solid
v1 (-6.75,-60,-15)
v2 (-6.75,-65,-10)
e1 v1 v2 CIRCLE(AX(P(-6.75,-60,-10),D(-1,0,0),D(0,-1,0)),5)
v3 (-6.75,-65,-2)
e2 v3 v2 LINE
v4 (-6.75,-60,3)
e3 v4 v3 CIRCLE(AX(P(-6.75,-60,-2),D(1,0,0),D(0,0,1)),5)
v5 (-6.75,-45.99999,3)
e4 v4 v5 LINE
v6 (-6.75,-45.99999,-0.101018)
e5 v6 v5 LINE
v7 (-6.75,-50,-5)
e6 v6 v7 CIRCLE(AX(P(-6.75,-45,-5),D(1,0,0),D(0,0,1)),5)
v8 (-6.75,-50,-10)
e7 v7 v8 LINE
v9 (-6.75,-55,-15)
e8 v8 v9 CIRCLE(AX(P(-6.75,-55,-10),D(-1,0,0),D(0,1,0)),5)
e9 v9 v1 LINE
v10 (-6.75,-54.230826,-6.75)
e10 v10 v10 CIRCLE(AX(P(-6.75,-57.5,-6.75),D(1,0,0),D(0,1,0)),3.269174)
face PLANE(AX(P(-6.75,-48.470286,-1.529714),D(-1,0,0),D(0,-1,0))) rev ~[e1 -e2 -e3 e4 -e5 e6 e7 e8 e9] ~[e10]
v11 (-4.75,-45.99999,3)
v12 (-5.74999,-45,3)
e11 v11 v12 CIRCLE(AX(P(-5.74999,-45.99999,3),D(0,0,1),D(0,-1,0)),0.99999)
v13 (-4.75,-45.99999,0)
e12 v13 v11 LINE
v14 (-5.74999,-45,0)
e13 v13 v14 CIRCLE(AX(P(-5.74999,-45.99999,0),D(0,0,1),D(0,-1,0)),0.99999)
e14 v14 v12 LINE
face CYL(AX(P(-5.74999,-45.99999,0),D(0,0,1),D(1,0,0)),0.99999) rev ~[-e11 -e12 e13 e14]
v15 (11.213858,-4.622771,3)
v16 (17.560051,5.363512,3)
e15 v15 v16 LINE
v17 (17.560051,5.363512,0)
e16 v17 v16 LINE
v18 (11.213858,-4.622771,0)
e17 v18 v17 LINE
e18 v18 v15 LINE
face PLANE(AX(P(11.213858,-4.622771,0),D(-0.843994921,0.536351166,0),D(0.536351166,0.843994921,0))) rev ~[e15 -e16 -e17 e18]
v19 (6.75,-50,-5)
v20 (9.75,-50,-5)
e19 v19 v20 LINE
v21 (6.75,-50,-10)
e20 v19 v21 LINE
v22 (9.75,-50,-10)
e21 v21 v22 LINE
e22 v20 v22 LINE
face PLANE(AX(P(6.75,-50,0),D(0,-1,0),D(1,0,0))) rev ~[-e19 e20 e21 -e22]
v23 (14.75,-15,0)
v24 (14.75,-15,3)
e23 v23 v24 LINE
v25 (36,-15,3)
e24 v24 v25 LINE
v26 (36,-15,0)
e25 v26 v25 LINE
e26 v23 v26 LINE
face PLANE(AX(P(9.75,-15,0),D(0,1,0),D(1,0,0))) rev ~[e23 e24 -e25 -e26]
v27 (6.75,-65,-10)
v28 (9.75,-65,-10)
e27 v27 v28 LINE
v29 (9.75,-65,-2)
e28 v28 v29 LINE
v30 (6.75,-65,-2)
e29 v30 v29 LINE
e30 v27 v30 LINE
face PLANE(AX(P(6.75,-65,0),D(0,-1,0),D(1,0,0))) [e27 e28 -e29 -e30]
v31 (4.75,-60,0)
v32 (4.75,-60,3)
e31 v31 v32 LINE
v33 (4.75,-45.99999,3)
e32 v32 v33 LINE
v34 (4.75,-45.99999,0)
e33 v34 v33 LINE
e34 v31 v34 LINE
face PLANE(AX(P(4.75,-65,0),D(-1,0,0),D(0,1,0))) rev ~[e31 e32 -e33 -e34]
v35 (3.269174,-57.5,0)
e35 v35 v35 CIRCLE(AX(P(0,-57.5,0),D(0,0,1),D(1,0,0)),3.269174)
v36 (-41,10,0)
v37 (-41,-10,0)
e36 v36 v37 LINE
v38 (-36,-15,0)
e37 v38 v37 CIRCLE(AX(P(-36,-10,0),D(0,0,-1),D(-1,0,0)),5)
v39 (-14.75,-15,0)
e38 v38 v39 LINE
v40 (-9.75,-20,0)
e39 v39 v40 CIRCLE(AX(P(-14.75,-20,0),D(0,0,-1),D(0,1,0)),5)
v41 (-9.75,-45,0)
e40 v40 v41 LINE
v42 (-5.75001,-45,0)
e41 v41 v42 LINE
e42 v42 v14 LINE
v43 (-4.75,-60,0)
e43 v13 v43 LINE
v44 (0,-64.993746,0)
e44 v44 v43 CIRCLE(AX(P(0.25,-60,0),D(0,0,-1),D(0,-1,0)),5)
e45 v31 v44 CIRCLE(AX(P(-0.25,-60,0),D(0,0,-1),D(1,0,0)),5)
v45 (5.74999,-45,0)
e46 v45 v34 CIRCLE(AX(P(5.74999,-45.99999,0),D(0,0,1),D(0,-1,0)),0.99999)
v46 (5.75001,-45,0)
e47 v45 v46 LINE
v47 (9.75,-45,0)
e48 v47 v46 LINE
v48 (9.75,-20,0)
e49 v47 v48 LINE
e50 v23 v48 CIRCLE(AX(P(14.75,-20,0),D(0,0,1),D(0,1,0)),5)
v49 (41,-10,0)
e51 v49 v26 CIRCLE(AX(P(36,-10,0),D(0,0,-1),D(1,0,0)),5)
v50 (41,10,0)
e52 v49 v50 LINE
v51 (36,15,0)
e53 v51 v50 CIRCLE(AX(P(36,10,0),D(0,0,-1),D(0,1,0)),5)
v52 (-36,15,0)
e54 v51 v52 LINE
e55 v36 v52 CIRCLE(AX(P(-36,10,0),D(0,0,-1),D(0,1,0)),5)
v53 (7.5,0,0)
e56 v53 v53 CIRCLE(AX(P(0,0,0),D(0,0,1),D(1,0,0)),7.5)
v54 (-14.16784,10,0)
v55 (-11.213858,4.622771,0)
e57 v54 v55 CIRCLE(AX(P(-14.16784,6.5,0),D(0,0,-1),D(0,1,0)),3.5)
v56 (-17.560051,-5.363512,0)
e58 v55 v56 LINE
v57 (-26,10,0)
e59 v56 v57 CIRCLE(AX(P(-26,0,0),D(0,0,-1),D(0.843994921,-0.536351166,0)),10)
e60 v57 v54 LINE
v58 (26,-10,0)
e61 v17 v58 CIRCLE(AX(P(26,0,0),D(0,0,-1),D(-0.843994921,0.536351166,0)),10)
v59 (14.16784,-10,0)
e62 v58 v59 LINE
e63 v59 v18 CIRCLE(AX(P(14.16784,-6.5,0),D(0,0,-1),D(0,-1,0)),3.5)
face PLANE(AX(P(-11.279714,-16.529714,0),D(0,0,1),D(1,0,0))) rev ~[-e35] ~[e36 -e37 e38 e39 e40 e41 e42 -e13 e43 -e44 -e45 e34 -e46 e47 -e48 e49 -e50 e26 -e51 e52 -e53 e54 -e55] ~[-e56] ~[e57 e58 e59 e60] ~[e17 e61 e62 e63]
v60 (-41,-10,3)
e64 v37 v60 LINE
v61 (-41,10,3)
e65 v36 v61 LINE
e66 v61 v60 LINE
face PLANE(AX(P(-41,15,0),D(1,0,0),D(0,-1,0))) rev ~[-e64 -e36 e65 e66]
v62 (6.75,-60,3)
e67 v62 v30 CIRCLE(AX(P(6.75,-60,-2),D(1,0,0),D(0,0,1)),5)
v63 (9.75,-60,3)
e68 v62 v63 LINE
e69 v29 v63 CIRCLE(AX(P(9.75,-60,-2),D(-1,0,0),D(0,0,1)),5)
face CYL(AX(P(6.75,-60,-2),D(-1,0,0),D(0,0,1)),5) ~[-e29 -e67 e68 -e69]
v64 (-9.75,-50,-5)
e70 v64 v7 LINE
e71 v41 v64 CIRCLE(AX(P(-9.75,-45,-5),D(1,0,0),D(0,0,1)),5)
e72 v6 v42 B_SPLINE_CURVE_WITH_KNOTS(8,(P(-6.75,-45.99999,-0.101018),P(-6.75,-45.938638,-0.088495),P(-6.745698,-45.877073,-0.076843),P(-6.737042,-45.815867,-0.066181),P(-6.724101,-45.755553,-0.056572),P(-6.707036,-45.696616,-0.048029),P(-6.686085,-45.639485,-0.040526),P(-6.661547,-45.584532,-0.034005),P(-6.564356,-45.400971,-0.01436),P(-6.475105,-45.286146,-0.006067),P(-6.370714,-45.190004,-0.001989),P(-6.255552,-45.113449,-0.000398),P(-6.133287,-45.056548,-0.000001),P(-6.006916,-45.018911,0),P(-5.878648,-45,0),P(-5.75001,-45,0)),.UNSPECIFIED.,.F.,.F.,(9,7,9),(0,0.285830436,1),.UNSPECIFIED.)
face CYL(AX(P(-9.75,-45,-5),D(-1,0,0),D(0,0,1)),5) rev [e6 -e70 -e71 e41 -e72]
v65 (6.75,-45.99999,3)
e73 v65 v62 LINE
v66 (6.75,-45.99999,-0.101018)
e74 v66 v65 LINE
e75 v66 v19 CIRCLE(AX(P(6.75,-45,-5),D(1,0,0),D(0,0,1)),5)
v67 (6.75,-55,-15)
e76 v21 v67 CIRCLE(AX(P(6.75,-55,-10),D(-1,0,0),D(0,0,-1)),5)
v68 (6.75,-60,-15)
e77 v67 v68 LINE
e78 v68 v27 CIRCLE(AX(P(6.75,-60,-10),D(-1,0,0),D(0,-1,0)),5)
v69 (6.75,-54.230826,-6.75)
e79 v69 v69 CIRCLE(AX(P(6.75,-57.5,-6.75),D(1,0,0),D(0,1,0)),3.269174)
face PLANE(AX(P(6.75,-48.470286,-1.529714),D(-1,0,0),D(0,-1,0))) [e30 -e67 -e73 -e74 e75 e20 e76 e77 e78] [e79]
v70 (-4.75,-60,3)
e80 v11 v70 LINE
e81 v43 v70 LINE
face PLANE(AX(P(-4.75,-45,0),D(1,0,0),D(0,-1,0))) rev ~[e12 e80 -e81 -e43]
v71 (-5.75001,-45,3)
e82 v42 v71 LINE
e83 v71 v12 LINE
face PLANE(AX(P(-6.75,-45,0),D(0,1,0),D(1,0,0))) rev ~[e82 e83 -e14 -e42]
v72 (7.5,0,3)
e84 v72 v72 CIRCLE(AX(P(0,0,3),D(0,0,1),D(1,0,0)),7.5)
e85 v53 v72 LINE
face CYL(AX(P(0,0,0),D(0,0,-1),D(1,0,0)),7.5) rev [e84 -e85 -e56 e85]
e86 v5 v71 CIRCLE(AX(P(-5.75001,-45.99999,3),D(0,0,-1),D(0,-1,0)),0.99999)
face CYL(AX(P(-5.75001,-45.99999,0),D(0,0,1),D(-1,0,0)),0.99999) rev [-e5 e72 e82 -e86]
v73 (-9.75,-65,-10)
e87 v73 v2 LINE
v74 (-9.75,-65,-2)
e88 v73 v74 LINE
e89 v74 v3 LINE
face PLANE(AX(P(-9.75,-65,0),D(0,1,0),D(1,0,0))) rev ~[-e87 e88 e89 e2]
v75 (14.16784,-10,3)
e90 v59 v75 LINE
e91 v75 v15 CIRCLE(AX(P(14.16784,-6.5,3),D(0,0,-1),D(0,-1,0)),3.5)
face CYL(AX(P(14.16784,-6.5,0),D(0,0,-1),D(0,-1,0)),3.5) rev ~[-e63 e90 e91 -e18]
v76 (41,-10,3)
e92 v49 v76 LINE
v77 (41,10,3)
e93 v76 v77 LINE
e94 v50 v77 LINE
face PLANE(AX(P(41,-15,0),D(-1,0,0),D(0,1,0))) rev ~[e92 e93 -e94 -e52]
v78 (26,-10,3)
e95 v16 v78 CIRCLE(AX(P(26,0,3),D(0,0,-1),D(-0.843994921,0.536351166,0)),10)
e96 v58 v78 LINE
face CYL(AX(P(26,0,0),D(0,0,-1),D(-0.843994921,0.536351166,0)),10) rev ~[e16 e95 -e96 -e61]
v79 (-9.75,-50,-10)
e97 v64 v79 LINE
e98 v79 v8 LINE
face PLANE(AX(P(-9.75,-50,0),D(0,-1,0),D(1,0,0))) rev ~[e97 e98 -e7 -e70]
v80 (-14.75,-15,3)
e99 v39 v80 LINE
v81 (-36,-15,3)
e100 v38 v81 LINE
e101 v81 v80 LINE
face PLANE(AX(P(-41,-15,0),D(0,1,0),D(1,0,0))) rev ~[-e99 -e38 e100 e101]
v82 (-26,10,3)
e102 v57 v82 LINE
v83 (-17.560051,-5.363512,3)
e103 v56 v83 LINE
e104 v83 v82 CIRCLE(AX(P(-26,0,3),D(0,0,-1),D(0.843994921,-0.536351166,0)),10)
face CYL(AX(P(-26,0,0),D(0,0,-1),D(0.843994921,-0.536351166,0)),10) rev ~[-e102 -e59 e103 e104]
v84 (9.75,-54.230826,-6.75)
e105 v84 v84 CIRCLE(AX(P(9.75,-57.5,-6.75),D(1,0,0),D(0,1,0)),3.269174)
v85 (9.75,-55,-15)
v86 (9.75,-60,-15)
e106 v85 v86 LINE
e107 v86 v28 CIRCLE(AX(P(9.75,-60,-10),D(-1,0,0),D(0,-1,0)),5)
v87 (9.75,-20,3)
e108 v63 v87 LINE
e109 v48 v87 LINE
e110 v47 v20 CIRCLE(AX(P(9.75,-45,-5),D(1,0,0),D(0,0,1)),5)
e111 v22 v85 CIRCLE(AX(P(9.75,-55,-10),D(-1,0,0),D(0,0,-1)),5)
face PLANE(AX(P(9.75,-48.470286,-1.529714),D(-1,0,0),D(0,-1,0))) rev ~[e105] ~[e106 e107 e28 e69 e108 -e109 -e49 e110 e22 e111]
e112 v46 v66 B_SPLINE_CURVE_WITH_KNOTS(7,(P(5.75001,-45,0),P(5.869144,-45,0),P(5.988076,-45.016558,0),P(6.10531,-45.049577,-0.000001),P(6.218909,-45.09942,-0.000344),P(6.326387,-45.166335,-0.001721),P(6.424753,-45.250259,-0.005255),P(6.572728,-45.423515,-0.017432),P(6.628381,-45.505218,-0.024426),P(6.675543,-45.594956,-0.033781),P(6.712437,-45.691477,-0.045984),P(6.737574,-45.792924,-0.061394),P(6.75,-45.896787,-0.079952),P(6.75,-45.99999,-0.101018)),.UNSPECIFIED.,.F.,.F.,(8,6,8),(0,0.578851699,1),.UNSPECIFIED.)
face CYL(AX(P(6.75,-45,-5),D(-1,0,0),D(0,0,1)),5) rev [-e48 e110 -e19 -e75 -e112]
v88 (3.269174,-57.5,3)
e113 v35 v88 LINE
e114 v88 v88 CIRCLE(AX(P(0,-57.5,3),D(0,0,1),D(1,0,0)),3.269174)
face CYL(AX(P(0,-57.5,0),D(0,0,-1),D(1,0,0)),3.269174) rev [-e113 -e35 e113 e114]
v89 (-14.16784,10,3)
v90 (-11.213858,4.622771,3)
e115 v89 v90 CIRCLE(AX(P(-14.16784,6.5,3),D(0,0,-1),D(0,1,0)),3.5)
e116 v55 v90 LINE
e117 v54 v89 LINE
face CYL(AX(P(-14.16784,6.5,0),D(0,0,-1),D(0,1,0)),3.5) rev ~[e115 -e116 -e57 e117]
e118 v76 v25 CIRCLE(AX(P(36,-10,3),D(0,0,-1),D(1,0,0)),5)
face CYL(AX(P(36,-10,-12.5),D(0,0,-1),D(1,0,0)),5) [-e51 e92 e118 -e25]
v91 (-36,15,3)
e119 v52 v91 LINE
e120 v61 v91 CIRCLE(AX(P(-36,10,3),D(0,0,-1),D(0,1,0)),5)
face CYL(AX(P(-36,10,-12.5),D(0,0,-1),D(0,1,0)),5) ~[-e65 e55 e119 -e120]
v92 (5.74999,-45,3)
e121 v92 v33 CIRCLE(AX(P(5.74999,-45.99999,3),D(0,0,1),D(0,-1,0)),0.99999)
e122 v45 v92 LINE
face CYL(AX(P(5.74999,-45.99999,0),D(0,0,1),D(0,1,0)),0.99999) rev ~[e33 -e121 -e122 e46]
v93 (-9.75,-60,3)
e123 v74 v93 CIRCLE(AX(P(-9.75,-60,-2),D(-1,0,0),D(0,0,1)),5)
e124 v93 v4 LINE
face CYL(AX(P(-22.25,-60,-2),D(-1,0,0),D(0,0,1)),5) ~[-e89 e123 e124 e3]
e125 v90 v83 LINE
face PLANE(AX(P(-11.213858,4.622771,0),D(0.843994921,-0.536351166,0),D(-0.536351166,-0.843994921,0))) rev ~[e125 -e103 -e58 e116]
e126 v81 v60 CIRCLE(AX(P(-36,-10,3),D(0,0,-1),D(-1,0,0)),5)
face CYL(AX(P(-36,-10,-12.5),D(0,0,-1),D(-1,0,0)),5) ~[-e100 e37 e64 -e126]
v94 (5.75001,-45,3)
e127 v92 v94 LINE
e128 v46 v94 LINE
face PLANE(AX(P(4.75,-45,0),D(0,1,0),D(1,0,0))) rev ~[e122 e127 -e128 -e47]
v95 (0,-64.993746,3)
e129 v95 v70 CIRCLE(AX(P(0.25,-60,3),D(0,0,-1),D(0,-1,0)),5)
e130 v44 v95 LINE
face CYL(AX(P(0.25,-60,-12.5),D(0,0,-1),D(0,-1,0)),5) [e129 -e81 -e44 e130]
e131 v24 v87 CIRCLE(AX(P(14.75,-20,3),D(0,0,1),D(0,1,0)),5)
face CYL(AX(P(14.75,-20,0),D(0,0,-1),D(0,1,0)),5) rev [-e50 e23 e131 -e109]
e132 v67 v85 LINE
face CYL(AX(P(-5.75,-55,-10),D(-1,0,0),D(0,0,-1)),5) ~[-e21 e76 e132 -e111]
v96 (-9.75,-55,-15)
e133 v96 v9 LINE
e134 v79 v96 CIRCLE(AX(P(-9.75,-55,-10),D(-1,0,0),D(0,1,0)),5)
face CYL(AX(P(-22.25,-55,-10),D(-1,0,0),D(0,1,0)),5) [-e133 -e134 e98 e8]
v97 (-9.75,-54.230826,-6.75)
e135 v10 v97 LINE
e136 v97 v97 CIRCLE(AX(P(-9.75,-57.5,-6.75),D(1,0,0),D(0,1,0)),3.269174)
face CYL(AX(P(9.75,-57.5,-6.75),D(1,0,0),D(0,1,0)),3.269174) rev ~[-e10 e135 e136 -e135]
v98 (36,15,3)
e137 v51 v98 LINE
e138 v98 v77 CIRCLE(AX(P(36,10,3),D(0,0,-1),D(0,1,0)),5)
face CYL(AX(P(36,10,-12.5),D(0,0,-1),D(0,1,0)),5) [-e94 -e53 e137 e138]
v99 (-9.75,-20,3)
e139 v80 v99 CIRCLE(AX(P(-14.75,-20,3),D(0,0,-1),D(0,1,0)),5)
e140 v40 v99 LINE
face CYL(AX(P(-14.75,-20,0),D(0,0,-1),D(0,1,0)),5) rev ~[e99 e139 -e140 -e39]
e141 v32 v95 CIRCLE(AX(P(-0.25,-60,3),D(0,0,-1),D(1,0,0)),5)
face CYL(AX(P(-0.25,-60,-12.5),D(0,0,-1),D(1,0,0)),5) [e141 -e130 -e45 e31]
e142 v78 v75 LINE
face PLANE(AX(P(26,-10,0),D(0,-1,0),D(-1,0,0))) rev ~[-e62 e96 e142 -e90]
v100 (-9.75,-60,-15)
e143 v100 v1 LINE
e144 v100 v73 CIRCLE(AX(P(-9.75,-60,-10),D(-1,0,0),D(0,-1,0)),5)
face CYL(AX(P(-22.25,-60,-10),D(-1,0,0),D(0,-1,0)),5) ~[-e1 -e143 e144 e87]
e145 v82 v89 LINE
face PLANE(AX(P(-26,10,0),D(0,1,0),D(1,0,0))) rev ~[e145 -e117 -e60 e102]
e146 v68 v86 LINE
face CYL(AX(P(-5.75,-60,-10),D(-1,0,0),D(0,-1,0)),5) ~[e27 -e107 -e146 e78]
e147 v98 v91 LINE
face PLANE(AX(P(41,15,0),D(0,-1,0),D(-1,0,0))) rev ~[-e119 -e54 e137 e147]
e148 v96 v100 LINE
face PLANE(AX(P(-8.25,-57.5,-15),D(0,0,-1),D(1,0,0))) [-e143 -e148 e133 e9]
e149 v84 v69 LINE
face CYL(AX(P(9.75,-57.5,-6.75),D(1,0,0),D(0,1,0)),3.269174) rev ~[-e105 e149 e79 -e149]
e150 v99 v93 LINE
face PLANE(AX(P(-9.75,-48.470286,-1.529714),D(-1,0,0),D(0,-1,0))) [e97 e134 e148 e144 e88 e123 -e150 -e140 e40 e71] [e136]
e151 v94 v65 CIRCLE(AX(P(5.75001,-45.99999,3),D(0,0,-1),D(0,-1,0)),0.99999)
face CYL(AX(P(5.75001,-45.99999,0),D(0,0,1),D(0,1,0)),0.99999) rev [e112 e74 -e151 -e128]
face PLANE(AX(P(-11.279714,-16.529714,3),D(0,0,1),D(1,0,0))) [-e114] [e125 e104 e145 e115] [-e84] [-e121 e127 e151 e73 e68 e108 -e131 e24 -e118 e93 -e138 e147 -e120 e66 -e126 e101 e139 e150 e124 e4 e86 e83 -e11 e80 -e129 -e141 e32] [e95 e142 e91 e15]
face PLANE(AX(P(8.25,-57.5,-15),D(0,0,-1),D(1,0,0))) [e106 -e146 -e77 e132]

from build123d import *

# Parameters (mm, degrees)
F1_R         = 7.5
F1_R_2       = 3.2691742077
F2_DEPTH     = 3
F3_W         = 3
F3_H         = 15
F4_DEPTH     = 15
F5_R         = 3.2691742077
F6_DEPTH     = 50.751
F7_T1_DEPTH  = 3
F7_T3_DEPTH  = 3
F7_T5_DEPTH  = 3
F7_T7_DEPTH  = 28
F7_T9_DEPTH  = 15.5
F7_T11_DEPTH = 28
F7_T13_DEPTH = 28
F7_T15_DEPTH = 15.5
F8_R         = 0.99999


# Not quite as in the source:
# - a fillet or chamfer that OpenCascade refuses, or shapes differently, is made with other operations: its cross-section is extruded or revolved along the edge and cut away or added
# - a fillet or chamfer is up to 0.001 mm smaller than in the source, because OpenCascade refuses the exact size


with BuildPart() as f2:
    # F1 (on Top) → F2 (new body)
    with BuildSketch(Plane.XY):
        Polygon((41, 15), (-41, 15), (-41, -15), (-9.75, -15), (9.75, -15), (41, -15), align=None)
        with BuildLine():
            ThreePointArc((-17.5600507895, -5.3635116598), (-34.7645626416, -4.8148148148), (-26, 10))
            Line((-26, 10), (-14.1678404338, 10))
            ThreePointArc((-14.1678404338, 10), (-11.1002435092, 8.1851851852), (-11.2138582101, 4.6227709191))
            Line((-11.2138582101, 4.6227709191), (-17.5600507895, -5.3635116598))
        make_face(mode=Mode.SUBTRACT)
        Circle(F1_R, mode=Mode.SUBTRACT)
        with BuildLine():
            ThreePointArc((17.5600507895, 5.3635116598), (34.7645626416, 4.8148148148), (26, -10))
            Line((26, -10), (14.1678404338, -10))
            ThreePointArc((14.1678404338, -10), (11.1002435092, -8.1851851852), (11.2138582101, -4.6227709191))
            Line((11.2138582101, -4.6227709191), (17.5600507895, 5.3635116598))
        make_face(mode=Mode.SUBTRACT)
        Polygon((9.75, -15), (-9.75, -15), (-9.75, -65), (-6.75, -65), (-6.75, -45), (-4.75, -45), (-4.75, -65), (4.75, -65), (4.75, -45), (6.75, -45), (6.75, -65), (9.75, -65), align=None)
        with Locations((0, -57.5)):
            Circle(F1_R_2, mode=Mode.SUBTRACT)
    extrude(amount=F2_DEPTH)

    # F3 (on face) → F4 (join)
    with BuildSketch(Plane(origin=(0, 0, 0), x_dir=(1, 0, 0), z_dir=(0, 0, -1))):
        with Locations((8.25, 57.5)):
            Rectangle(F3_W, F3_H)
        with Locations((-8.25, 57.5)):
            Rectangle(F3_W, F3_H)
    extrude(amount=F4_DEPTH)

    # F5 (on face) → F6 (cut, through all)
    with BuildSketch(Plane.YZ.offset(9.75)):
        with Locations((-57.5, -6.75)):
            Circle(F5_R)
    extrude(amount=-F6_DEPTH, mode=Mode.SUBTRACT)

    # F7: fillet of radius 5 on 16 edges, made by hand

    # F7_s2 → F7_t1 (join)
    with BuildSketch(Plane.XY):
        with BuildLine():
            ThreePointArc((-14.75, -15), (-11.2144660941, -16.4644660941), (-9.75, -20))
            Line((-9.75, -20), (-9.75, -15))
            Line((-9.75, -15), (-14.75, -15))
        make_face()
        with BuildLine():
            ThreePointArc((14.75, -15), (11.2144660941, -16.4644660941), (9.75, -20))
            Line((9.75, -20), (9.75, -15))
            Line((9.75, -15), (14.75, -15))
        make_face()
    extrude(amount=F7_T1_DEPTH)

    # F7_s4 → F7_t3 (join)
    with BuildSketch(Plane.YZ.offset(6.75)):
        with BuildLine():
            ThreePointArc((-45, 0), (-48.5355339059, -1.4644660941), (-50, -5))
            Line((-50, -5), (-50, 0))
            Line((-50, 0), (-45, 0))
        make_face()
    extrude(amount=F7_T3_DEPTH)

    # F7_s6 → F7_t5 (join)
    with BuildSketch(Plane.YZ.offset(-9.75)):
        with BuildLine():
            ThreePointArc((-45, 0), (-48.5355339059, -1.4644660941), (-50, -5))
            Line((-50, -5), (-50, 0))
            Line((-50, 0), (-45, 0))
        make_face()
    extrude(amount=F7_T5_DEPTH)

    # F7_s8 → F7_t7 (cut)
    with BuildSketch(Plane.XY.offset(-12.5)):
        with BuildLine():
            ThreePointArc((-36, 15), (-39.5355339059, 13.5355339059), (-41, 10))
            Line((-41, 10), (-41, 15))
            Line((-41, 15), (-36, 15))
        make_face()
        with BuildLine():
            ThreePointArc((36, 15), (39.5355339059, 13.5355339059), (41, 10))
            Line((41, 10), (41, 15))
            Line((41, 15), (36, 15))
        make_face()
        with BuildLine():
            ThreePointArc((41, -10), (39.5355339059, -13.5355339059), (36, -15))
            Line((36, -15), (41, -15))
            Line((41, -15), (41, -10))
        make_face()
        with BuildLine():
            ThreePointArc((-41, -10), (-39.5355339059, -13.5355339059), (-36, -15))
            Line((-36, -15), (-41, -15))
            Line((-41, -15), (-41, -10))
        make_face()
        with BuildLine():
            ThreePointArc((4.75, -60), (3.2855339059, -63.5355339059), (-0.25, -65))
            Line((-0.25, -65), (4.75, -65))
            Line((4.75, -65), (4.75, -60))
        make_face()
        with BuildLine():
            ThreePointArc((0.25, -65), (-3.2855339059, -63.5355339059), (-4.75, -60))
            Line((-4.75, -60), (-4.75, -65))
            Line((-4.75, -65), (0.25, -65))
        make_face()
    extrude(amount=F7_T7_DEPTH, mode=Mode.SUBTRACT)

    # F7_s10 → F7_t9 (cut)
    with BuildSketch(Plane.YZ.offset(-22.25)):
        with BuildLine():
            ThreePointArc((-60, 3), (-63.5355339059, 1.5355339059), (-65, -2))
            Line((-65, -2), (-65, 3))
            Line((-65, 3), (-60, 3))
        make_face()
    extrude(amount=F7_T9_DEPTH, mode=Mode.SUBTRACT)

    # F7_s12 → F7_t11 (cut)
    with BuildSketch(Plane.YZ.offset(-22.25)):
        with BuildLine():
            ThreePointArc((-50, -10), (-51.4644660941, -13.5355339059), (-55, -15))
            Line((-55, -15), (-50, -15))
            Line((-50, -15), (-50, -10))
        make_face()
        with BuildLine():
            ThreePointArc((-65, -10), (-63.5355339059, -13.5355339059), (-60, -15))
            Line((-60, -15), (-65, -15))
            Line((-65, -15), (-65, -10))
        make_face()
    extrude(amount=F7_T11_DEPTH, mode=Mode.SUBTRACT)

    # F7_s14 → F7_t13 (cut)
    with BuildSketch(Plane.YZ.offset(-5.75)):
        with BuildLine():
            ThreePointArc((-55, -15), (-51.4644660941, -13.5355339059), (-50, -10))
            Line((-50, -10), (-50, -15))
            Line((-50, -15), (-55, -15))
        make_face()
        with BuildLine():
            ThreePointArc((-65, -10), (-63.5355339059, -13.5355339059), (-60, -15))
            Line((-60, -15), (-65, -15))
            Line((-65, -15), (-65, -10))
        make_face()
    extrude(amount=F7_T13_DEPTH, mode=Mode.SUBTRACT)

    # F7_s16 → F7_t15 (cut)
    with BuildSketch(Plane.YZ.offset(6.75)):
        with BuildLine():
            ThreePointArc((-60, 3), (-63.5355339059, 1.5355339059), (-65, -2))
            Line((-65, -2), (-65, 3))
            Line((-65, 3), (-60, 3))
        make_face()
    extrude(amount=F7_T15_DEPTH, mode=Mode.SUBTRACT)

    # F8 (radius 1 in the source; OpenCascade refuses exactly that, so slightly less here)
    f8_edges = [f2.edges().sort_by_distance(p)[0] for p in [
        (4.75, -45, 1.5),
        (6.75, -45, 1.5),
        (-4.75, -45, 1.5),
        (-6.75, -45, 1.5),
    ]]
    fillet(f8_edges, radius=F8_R)


solid = f2.part
